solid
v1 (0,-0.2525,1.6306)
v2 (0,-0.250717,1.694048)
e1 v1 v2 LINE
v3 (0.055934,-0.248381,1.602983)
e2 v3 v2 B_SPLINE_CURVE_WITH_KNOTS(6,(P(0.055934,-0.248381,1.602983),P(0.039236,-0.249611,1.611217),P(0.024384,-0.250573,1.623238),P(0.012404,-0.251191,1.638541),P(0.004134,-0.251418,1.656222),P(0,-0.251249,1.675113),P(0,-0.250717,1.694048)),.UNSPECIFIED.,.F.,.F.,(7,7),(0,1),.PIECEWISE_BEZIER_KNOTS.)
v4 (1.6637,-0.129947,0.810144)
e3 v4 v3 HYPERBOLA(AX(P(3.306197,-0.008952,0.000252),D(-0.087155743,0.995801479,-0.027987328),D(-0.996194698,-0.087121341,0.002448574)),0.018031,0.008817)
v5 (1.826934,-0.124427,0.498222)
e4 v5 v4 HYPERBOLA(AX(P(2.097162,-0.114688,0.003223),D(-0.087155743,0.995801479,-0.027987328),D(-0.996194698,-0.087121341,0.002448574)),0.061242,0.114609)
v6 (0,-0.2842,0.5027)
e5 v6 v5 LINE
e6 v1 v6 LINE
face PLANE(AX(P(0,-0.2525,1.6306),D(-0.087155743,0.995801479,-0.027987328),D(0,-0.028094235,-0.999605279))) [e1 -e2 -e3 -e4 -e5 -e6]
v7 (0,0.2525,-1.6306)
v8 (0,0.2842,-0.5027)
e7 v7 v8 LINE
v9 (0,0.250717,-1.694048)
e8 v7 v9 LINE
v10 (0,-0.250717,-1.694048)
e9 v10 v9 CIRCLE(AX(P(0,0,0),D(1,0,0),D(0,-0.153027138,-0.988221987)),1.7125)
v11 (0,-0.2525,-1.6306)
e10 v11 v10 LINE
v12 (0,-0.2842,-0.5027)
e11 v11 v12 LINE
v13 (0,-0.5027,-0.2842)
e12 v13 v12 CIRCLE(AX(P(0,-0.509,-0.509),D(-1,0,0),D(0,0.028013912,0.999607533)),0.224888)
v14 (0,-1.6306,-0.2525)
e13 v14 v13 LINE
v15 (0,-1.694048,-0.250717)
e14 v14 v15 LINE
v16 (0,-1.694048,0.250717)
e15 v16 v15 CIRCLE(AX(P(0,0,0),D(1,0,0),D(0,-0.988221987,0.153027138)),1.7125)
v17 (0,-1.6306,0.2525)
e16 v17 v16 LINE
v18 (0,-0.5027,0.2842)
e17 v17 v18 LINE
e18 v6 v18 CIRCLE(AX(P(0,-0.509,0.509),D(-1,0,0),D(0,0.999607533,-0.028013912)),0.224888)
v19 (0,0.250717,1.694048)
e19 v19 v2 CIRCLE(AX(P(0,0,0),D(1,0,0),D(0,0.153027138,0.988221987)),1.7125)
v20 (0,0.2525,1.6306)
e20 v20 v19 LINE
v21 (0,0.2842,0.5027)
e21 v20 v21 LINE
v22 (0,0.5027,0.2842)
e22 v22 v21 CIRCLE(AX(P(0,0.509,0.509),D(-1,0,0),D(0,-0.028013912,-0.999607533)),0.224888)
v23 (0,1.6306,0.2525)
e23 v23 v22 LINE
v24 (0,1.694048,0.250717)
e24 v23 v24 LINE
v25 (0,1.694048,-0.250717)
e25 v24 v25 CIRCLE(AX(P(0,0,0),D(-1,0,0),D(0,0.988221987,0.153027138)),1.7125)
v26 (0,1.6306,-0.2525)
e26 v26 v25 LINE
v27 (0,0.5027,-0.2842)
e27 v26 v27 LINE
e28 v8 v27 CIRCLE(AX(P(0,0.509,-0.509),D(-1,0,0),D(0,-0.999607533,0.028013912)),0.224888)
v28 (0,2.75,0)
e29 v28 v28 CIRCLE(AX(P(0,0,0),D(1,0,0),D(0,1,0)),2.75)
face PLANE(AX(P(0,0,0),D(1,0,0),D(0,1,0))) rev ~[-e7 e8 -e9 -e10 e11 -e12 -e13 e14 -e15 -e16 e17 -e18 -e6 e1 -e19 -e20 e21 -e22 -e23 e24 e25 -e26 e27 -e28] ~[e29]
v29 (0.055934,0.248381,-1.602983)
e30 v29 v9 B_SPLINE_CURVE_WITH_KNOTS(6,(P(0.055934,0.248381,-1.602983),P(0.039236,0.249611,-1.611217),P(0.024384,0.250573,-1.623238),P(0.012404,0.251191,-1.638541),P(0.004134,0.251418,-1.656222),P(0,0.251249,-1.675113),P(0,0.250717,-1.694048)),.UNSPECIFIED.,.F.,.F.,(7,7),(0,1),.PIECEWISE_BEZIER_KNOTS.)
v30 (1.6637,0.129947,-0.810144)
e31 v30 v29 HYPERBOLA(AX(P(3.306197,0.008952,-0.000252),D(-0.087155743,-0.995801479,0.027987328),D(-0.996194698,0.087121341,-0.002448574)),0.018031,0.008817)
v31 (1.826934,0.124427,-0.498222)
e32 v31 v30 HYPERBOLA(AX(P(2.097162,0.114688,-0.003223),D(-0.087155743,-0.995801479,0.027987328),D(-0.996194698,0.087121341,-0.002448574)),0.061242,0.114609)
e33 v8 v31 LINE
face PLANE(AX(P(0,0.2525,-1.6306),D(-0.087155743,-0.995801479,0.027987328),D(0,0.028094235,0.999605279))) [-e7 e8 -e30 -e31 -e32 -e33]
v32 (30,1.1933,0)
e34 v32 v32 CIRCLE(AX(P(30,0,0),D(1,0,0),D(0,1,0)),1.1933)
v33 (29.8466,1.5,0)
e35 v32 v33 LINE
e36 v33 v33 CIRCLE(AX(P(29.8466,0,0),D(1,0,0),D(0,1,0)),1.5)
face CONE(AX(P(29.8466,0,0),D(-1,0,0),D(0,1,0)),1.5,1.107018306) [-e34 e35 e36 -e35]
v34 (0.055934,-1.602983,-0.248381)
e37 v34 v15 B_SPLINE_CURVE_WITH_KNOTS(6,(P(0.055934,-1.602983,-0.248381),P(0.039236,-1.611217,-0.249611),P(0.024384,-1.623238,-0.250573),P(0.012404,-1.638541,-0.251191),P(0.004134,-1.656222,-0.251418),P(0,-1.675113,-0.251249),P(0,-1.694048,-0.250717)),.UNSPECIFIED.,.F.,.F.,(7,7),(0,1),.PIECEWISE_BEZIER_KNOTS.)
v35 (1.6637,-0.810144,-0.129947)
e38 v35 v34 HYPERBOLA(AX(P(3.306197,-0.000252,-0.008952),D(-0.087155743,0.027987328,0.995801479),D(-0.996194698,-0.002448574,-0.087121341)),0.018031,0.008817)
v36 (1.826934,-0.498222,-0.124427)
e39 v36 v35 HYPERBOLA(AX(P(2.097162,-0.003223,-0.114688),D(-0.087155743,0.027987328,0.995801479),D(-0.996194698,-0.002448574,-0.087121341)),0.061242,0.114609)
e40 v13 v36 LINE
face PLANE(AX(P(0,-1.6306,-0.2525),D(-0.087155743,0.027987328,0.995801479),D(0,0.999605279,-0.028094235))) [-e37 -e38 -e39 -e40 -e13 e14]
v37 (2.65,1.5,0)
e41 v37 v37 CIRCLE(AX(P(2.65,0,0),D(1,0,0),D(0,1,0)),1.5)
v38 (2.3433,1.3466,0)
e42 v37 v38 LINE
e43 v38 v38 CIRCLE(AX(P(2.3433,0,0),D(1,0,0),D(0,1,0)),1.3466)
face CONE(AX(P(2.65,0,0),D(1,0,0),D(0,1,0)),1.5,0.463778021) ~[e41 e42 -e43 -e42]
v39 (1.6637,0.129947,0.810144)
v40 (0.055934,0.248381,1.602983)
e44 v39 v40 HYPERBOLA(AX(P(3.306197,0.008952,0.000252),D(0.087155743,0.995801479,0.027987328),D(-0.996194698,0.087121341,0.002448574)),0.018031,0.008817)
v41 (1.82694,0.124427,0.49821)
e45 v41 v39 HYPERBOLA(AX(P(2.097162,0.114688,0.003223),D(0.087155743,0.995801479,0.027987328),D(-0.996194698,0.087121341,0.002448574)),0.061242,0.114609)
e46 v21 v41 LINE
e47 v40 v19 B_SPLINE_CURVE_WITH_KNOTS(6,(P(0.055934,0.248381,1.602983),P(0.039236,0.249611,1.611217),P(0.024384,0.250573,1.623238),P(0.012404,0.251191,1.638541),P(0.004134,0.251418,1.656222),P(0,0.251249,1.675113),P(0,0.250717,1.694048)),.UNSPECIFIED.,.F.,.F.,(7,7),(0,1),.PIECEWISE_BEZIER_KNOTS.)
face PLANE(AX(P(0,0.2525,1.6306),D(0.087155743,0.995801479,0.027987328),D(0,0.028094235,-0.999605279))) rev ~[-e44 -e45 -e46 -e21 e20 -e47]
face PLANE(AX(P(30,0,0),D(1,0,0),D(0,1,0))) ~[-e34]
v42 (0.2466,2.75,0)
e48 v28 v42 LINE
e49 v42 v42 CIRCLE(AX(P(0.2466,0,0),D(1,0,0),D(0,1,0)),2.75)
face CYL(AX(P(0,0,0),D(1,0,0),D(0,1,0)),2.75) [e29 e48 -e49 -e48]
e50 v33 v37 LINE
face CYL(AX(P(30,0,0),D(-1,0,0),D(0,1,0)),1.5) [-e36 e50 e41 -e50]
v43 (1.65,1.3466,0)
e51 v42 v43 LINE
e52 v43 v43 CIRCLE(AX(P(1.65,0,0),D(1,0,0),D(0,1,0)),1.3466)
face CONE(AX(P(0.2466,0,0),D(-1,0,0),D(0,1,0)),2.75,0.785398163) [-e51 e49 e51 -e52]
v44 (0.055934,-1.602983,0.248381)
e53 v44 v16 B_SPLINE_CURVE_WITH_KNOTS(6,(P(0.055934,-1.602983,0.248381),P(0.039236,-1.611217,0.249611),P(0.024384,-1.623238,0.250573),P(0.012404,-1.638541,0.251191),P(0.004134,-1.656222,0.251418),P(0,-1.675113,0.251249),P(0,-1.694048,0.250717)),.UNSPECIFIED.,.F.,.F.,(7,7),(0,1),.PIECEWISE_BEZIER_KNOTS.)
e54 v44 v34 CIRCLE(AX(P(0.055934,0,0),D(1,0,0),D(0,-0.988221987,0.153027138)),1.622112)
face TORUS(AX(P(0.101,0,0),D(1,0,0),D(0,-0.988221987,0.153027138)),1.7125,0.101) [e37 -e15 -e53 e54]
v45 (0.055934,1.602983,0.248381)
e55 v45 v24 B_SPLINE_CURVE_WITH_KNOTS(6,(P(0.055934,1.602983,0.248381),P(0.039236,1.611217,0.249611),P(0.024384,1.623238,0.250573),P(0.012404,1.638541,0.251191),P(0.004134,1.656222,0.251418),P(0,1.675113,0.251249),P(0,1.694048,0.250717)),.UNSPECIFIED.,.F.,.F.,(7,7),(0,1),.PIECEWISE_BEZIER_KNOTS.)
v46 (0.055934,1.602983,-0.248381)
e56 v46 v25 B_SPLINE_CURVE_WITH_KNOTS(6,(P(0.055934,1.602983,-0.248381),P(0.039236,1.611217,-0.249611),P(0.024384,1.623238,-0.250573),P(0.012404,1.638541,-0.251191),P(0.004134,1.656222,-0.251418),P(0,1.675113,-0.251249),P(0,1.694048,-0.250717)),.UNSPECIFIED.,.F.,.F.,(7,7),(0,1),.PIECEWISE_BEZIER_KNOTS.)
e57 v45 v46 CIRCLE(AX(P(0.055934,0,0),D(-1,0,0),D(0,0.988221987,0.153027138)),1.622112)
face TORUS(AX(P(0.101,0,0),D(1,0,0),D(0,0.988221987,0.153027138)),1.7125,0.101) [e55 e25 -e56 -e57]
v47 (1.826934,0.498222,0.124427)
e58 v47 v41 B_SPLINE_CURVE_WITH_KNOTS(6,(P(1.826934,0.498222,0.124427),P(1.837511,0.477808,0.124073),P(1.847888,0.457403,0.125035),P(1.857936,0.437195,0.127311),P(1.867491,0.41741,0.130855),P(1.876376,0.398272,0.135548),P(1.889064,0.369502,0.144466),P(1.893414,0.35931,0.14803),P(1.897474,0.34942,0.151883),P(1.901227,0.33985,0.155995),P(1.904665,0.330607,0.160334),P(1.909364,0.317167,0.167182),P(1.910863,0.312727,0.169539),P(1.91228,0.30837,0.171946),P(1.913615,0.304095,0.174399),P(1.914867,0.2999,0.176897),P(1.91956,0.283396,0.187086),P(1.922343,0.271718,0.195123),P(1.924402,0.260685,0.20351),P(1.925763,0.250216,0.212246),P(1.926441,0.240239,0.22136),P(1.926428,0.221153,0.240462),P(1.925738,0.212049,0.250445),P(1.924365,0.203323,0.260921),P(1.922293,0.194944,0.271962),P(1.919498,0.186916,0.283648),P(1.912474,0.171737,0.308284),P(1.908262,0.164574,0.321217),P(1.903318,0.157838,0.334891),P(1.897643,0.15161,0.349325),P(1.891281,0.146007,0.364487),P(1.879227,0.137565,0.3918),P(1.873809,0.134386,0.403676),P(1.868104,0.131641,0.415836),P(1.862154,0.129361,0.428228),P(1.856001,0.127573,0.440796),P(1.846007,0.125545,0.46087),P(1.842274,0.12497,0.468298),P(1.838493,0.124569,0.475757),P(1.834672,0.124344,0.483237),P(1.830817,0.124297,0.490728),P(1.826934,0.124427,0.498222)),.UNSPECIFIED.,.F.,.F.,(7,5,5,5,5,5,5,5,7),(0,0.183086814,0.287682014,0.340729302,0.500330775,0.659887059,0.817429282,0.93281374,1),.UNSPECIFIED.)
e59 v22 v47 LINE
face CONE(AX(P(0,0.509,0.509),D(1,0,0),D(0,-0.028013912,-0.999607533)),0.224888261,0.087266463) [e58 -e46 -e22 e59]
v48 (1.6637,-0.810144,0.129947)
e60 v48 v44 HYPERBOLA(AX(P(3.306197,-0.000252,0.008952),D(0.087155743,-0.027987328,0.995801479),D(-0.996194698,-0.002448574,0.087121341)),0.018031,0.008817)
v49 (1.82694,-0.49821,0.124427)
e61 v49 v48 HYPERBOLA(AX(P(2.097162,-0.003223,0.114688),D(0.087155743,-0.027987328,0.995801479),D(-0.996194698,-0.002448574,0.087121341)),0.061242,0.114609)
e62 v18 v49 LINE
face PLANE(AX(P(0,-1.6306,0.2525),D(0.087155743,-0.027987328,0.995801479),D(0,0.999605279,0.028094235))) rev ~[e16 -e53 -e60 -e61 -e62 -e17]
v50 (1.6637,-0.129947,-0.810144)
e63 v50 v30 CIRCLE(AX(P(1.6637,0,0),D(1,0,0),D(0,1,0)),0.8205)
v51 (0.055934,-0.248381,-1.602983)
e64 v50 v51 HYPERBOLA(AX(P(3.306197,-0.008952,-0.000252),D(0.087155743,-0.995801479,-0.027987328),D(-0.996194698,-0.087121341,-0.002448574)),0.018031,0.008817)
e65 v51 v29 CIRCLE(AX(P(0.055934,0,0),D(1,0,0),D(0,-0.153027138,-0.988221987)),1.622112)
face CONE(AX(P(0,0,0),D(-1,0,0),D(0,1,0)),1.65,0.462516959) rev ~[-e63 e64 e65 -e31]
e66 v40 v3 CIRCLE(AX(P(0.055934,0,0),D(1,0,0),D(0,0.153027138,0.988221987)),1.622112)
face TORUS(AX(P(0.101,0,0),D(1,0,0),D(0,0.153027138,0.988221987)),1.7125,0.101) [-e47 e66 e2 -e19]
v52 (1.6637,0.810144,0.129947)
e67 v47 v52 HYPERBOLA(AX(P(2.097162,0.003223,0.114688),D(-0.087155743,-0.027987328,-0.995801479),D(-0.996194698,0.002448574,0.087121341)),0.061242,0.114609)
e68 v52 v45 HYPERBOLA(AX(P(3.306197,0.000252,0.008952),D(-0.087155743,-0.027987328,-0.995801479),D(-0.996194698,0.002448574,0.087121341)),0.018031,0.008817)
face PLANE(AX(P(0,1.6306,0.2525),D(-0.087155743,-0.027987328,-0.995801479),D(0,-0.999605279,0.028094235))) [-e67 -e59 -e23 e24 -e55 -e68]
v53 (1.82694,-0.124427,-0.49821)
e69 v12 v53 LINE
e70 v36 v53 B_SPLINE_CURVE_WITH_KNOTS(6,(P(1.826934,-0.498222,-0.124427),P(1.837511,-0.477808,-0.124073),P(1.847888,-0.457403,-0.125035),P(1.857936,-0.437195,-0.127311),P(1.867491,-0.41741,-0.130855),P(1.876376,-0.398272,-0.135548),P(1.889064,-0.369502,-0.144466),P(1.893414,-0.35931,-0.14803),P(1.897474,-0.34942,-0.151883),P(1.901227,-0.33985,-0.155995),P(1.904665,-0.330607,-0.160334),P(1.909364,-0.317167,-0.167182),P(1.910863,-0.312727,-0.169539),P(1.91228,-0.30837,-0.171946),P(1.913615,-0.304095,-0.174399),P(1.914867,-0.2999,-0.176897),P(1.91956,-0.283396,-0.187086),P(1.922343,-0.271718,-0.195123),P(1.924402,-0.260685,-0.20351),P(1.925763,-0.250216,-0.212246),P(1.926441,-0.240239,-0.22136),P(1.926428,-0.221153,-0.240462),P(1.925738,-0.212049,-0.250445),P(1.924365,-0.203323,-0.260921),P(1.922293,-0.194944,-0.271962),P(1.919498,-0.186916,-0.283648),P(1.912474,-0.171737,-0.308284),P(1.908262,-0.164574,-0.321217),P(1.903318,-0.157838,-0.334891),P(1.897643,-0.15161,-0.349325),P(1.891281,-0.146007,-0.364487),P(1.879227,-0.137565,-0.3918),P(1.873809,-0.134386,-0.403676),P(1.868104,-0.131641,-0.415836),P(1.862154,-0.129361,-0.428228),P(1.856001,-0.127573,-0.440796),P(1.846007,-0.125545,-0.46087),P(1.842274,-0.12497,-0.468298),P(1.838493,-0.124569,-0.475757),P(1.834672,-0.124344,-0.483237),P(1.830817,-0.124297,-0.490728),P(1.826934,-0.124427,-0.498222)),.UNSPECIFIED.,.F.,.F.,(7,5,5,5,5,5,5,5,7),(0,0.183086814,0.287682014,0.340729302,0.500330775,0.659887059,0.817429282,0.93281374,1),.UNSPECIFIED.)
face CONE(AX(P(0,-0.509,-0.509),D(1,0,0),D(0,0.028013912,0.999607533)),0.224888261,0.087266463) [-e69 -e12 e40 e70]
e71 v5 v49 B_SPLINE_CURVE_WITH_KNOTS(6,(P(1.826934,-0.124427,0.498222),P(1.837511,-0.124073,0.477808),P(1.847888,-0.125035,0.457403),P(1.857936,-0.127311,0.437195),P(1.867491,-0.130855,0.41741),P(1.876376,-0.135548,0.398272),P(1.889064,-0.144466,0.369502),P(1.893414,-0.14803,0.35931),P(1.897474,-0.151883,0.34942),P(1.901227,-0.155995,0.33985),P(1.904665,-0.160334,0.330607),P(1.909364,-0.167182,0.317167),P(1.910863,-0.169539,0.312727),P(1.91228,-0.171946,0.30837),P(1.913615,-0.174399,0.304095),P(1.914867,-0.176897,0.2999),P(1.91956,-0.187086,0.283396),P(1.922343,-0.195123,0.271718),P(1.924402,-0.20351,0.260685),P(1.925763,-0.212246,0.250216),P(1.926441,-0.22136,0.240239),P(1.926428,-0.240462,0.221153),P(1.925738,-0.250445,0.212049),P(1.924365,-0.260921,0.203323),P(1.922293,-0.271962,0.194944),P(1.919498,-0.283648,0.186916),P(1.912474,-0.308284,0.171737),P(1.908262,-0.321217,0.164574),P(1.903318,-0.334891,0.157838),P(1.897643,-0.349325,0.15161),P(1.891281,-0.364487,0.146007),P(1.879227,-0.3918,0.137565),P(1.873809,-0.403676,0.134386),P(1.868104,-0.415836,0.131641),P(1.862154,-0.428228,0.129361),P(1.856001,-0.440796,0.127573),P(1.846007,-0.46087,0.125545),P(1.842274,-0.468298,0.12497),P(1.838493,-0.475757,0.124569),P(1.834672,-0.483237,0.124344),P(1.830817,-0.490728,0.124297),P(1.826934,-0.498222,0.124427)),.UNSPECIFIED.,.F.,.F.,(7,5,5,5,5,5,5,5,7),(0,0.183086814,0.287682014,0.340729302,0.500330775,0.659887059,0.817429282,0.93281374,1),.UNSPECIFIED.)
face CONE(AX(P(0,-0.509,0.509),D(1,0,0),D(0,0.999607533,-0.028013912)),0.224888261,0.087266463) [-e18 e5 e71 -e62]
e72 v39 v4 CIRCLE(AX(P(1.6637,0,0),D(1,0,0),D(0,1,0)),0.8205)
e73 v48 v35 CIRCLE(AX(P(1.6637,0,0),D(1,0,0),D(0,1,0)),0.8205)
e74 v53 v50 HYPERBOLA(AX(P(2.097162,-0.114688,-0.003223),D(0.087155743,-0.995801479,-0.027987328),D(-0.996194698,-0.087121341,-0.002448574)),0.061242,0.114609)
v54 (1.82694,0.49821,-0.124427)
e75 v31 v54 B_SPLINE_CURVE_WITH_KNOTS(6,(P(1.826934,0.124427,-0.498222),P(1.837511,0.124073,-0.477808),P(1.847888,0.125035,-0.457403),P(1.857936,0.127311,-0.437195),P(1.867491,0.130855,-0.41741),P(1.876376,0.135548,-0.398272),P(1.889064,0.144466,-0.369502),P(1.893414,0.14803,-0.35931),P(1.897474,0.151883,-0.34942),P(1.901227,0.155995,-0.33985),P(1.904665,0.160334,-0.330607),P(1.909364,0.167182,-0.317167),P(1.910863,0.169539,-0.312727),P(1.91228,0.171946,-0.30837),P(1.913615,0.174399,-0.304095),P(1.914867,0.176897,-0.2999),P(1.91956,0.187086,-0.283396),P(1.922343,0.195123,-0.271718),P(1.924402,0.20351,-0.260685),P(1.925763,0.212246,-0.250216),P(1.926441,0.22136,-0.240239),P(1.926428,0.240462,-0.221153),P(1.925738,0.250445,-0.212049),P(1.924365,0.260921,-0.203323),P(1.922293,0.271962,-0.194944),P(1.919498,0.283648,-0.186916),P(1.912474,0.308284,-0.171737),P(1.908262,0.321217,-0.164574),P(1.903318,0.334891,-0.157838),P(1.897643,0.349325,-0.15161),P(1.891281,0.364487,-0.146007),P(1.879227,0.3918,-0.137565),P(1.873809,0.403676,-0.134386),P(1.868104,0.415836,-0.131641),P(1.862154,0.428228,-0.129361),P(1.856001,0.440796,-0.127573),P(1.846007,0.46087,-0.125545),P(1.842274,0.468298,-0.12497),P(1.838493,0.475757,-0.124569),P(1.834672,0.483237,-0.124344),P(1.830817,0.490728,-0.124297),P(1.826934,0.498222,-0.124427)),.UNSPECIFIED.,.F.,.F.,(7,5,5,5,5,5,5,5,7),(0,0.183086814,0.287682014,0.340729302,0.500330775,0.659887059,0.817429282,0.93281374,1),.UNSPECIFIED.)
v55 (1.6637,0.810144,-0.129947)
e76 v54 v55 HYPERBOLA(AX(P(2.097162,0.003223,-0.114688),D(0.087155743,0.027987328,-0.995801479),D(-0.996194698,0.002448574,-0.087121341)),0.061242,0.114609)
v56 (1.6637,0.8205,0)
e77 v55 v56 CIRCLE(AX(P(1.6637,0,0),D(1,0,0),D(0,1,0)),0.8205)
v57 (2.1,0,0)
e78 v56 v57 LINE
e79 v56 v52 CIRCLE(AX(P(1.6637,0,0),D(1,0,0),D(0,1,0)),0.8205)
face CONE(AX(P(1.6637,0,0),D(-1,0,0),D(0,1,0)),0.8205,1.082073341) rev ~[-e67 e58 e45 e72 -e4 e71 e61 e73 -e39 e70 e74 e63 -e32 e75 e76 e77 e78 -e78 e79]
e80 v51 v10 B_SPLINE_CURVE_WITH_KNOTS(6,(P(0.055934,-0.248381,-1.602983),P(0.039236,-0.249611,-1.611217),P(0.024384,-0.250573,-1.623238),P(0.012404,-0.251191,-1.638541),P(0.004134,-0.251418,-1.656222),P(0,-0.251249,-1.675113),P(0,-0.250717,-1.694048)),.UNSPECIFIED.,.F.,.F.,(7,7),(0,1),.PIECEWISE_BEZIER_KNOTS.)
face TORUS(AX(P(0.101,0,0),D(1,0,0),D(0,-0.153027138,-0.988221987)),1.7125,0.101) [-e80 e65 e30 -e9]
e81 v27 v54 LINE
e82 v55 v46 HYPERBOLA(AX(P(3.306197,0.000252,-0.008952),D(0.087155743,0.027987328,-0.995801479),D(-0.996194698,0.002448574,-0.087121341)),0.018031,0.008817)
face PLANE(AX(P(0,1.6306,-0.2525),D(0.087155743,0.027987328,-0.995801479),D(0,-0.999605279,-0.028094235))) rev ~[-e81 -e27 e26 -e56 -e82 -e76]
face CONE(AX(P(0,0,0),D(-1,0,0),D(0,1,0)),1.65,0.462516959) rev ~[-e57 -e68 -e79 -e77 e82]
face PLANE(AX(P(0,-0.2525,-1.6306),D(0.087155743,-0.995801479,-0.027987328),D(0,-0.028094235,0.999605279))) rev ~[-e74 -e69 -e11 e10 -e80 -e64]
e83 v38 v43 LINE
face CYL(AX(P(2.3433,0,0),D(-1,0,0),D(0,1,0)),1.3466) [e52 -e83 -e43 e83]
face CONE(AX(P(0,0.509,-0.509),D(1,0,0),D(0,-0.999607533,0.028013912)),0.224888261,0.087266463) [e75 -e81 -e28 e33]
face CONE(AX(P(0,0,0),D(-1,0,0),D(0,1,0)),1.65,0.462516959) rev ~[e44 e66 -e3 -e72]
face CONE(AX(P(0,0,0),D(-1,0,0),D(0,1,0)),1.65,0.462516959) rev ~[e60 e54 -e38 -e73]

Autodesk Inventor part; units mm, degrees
ref_plane "YZ Plane" through (0, 0, 0) normal (1, 0, 0) x (0, 1, 0)
ref_plane "XZ Plane" through (0, 0, 0) normal (0, 1, 0) x (-1, 0, 0)
sketch "Sketch1" plane through (0, 0, 0) normal (0, 0, 1) x (1, 0, 0)
  line L0 (2.1, 0) -> (30, 0)
  line L1 (30, 0) -> (30, 1.5)
  line L2 (30, 1.5) -> (2.65, 1.5)
  line L3 (2.65, 1.5) -> (2.3433, 1.3466)
  line L4 (2.3433, 1.3466) -> (1.65, 1.3466)
  line L5 (0, 2.75) -> (0, 1.65)
  line L6 (0, 1.65) -> (1.6637, 0.8205)
  line L7 (1.6637, 0.8205) -> (2.1, 0)
  line L8 (-6, 0) -> (36, 0) projected
  line L9 (0, -0.55) -> (0, 3.3) projected
  line L10 (0, 2.75) -> (0.2466, 2.75)
  line L11 (0.2466, 2.75) -> (1.65, 1.3466)
  line L12 (2.65, 1.5) -> (1.4966, 1.5) construction
  dimension "d1" = 27.35
  dimension "d2" = 3
  dimension "d3" = 2.6933
  dimension "d4" = 3.3
  dimension "d5" = 26.5
  dimension "d6" = 62
  dimension "d7" = 2.1
  dimension "d8" = 0.3067
  dimension "d12" = 5.5
  dimension "d13" = 45
  dimension "d15" = 30
  dimension "d24" = 1.65
revolve "Body" add sketch "Sketch1" angle 360 about axis through (2.1, 0, 0) along (1, 0, 0) contours L7 L6 L5 L10 L11 L4 L3 L2 L1 L0
sketch "Sketch2" plane through (0, 0, 0) normal (-1, 0, 0) x (0, 0, 1)
  line L0 (0, 1.65) -> (0, 0) construction
  line L1 (0, 0) -> (1.65, 0) construction
  arc A0 (0.495, 0) -> (0, 0.495) centre (0, 0) ccw construction
  arc A1 (0.5775, 0) -> (0, 0.5775) centre (0, 0) ccw construction
  arc A2 (1.6306, 0.2525) -> (0.2525, 1.6306) centre (0, 0) ccw
  line L2 (0, 0) -> (1.1667, 1.1667) construction
  line L3 (0.2525, 1.6306) -> (0.2842, 0.5027)
  line L4 (1.6306, 0.2525) -> (0.5027, 0.2842)
  arc A3 (0.2525, 1.6306) -> (0, 1.65) centre (0, 0) ccw
  arc A4 (1.65, 0) -> (1.6306, 0.2525) centre (0, 0) ccw
  line L5 (0, -3.85) -> (0, 3.85) projected
  line L6 (-3.85, 0) -> (3.85, 0) projected
  arc A5 (0.2525, -1.6306) -> (1.6306, -0.2525) centre (0, 0) ccw
  line L7 (0.2525, -1.6306) -> (0.2842, -0.5027)
  line L8 (1.6306, -0.2525) -> (0.5027, -0.2842)
  arc A6 (0, -1.65) -> (0.2525, -1.6306) centre (0, 0) ccw
  arc A7 (1.6306, -0.2525) -> (1.65, 0) centre (0, 0) ccw
  arc A8 (-0.2525, 1.6306) -> (-1.6306, 0.2525) centre (0, 0) ccw
  line L9 (-0.2525, 1.6306) -> (-0.2842, 0.5027)
  line L10 (-1.6306, 0.2525) -> (-0.5027, 0.2842)
  arc A9 (0, 1.65) -> (-0.2525, 1.6306) centre (0, 0) ccw
  arc A10 (-1.6306, 0.2525) -> (-1.65, 0) centre (0, 0) ccw
  arc A11 (-0.2525, -1.6306) -> (0, -1.65) centre (0, 0) ccw
  arc A12 (-1.6306, -0.2525) -> (-0.2525, -1.6306) centre (0, 0) ccw
  arc A13 (-1.65, 0) -> (-1.6306, -0.2525) centre (0, 0) ccw
  line L11 (-1.6306, -0.2525) -> (-0.5027, -0.2842)
  line L12 (-0.2525, -1.6306) -> (-0.2842, -0.5027)
  arc A14 (0.2842, 0.5027) -> (0.5027, 0.2842) centre (0.509, 0.509) ccw
  arc A15 (0.5027, -0.2842) -> (0.2842, -0.5027) centre (0.509, -0.509) ccw
  arc A16 (-0.5027, 0.2842) -> (-0.2842, 0.5027) centre (-0.509, 0.509) ccw
  arc A17 (-0.2842, -0.5027) -> (-0.5027, -0.2842) centre (-0.509, -0.509) ccw
  point P0 (1.1667, -1.1667)
  point P1 (-1.1667, 1.1667)
  point P2 (-1.1667, -1.1667)
  dimension "d17" = 0.99
  dimension "d18" = 1.155
  dimension "d19" = 3.3
  dimension "d20" = 45
  dimension "d21" = 0.2525
extrude "Slot" add sketch "Sketch2" against normal up to next draft 5 contours L4 A14 L3 A2 | A5 L7 A15 L8 | L9 A16 L10 A8 | A12 L11 A17 L12
fillet "Fillet1" radius 0.101 4 edges at (0, 1.65, 0) (0, 0, -1.65) (0, -1.65, 0) (0, 0, 1.65)
thread "Thread" size "M3x0.5" class "6g" standard "ISO Metric profile" length 27.35
chamfer "Chamfer1" distance 0.3067 distance2 0.1534 1 edges at (30, -1.5, 0) measured on face at (30, 0.3743, 0.3316)
ref_plane "Work Plane2" through (3.35, 0, 0) normal (0, 0, -1) x (1, 0, 0)
equation "\"d1\" = GEL"
equation "\"d2\" = GD"
equation "\"d3\" = BDM"
equation "\"d4\" = SDM"
equation "\"d7\" = INTI"
equation "\"d8\" = GAL"
equation "\"d12\" = KOD"
equation "\"d13\" = 0.5 * SEWI"
equation "\"d15\" = NLG"
equation "\"d24\" = KOH"
equation "\"d17\" = 0.3 * SDM"
equation "\"d18\" = 0.35 * SDM"
equation "\"d19\" = SDM"
equation "\"d21\" = 0.5 * SBR"
equation "\"d23\" = 0.2 * SBR"
equation "\"d10\" = GEL"
equation "\"d25\" = -0.5 * SPD + 0.5 * GD"
equation "\"d26\" = 0.5 * GAL"
equation "\"NLG\" = 30"
equation "\"GEL\" = 27.35"
equation "\"GAL\" = 0.61345 * PTC"
equation "\"SPD\" = NND - 1.2269 * PTC"
equation "\"KOD\" = 5.5"
equation "\"KOH\" = 1.65"
equation "\"SBR\" = 0.505"
equation "\"INTI\" = 2.1"
equation "\"SDM\" = 3.3"
equation "\"GD\" = NND"
equation "\"BDM\" = NND - GAL"
equation "\"SEWI\" = 90deg"
equation "\"d9\" = SDM"
equation "\"GUL\" = 0.61345 * PTC"
equation "\"TOA\" = 30deg"
equation "\"EPV\" = 3.15"
equation "\"THREADDIA\" = 3"
equation "\"PTC\" = 0.5"
equation "\"NND\" = 3"
equation "\"GD1\" = THREADDIA - 1.2269 * PTC"
properties part number "JIS B 1111 - Csunk M3 x 30 - H" material "Steel, Mild"
